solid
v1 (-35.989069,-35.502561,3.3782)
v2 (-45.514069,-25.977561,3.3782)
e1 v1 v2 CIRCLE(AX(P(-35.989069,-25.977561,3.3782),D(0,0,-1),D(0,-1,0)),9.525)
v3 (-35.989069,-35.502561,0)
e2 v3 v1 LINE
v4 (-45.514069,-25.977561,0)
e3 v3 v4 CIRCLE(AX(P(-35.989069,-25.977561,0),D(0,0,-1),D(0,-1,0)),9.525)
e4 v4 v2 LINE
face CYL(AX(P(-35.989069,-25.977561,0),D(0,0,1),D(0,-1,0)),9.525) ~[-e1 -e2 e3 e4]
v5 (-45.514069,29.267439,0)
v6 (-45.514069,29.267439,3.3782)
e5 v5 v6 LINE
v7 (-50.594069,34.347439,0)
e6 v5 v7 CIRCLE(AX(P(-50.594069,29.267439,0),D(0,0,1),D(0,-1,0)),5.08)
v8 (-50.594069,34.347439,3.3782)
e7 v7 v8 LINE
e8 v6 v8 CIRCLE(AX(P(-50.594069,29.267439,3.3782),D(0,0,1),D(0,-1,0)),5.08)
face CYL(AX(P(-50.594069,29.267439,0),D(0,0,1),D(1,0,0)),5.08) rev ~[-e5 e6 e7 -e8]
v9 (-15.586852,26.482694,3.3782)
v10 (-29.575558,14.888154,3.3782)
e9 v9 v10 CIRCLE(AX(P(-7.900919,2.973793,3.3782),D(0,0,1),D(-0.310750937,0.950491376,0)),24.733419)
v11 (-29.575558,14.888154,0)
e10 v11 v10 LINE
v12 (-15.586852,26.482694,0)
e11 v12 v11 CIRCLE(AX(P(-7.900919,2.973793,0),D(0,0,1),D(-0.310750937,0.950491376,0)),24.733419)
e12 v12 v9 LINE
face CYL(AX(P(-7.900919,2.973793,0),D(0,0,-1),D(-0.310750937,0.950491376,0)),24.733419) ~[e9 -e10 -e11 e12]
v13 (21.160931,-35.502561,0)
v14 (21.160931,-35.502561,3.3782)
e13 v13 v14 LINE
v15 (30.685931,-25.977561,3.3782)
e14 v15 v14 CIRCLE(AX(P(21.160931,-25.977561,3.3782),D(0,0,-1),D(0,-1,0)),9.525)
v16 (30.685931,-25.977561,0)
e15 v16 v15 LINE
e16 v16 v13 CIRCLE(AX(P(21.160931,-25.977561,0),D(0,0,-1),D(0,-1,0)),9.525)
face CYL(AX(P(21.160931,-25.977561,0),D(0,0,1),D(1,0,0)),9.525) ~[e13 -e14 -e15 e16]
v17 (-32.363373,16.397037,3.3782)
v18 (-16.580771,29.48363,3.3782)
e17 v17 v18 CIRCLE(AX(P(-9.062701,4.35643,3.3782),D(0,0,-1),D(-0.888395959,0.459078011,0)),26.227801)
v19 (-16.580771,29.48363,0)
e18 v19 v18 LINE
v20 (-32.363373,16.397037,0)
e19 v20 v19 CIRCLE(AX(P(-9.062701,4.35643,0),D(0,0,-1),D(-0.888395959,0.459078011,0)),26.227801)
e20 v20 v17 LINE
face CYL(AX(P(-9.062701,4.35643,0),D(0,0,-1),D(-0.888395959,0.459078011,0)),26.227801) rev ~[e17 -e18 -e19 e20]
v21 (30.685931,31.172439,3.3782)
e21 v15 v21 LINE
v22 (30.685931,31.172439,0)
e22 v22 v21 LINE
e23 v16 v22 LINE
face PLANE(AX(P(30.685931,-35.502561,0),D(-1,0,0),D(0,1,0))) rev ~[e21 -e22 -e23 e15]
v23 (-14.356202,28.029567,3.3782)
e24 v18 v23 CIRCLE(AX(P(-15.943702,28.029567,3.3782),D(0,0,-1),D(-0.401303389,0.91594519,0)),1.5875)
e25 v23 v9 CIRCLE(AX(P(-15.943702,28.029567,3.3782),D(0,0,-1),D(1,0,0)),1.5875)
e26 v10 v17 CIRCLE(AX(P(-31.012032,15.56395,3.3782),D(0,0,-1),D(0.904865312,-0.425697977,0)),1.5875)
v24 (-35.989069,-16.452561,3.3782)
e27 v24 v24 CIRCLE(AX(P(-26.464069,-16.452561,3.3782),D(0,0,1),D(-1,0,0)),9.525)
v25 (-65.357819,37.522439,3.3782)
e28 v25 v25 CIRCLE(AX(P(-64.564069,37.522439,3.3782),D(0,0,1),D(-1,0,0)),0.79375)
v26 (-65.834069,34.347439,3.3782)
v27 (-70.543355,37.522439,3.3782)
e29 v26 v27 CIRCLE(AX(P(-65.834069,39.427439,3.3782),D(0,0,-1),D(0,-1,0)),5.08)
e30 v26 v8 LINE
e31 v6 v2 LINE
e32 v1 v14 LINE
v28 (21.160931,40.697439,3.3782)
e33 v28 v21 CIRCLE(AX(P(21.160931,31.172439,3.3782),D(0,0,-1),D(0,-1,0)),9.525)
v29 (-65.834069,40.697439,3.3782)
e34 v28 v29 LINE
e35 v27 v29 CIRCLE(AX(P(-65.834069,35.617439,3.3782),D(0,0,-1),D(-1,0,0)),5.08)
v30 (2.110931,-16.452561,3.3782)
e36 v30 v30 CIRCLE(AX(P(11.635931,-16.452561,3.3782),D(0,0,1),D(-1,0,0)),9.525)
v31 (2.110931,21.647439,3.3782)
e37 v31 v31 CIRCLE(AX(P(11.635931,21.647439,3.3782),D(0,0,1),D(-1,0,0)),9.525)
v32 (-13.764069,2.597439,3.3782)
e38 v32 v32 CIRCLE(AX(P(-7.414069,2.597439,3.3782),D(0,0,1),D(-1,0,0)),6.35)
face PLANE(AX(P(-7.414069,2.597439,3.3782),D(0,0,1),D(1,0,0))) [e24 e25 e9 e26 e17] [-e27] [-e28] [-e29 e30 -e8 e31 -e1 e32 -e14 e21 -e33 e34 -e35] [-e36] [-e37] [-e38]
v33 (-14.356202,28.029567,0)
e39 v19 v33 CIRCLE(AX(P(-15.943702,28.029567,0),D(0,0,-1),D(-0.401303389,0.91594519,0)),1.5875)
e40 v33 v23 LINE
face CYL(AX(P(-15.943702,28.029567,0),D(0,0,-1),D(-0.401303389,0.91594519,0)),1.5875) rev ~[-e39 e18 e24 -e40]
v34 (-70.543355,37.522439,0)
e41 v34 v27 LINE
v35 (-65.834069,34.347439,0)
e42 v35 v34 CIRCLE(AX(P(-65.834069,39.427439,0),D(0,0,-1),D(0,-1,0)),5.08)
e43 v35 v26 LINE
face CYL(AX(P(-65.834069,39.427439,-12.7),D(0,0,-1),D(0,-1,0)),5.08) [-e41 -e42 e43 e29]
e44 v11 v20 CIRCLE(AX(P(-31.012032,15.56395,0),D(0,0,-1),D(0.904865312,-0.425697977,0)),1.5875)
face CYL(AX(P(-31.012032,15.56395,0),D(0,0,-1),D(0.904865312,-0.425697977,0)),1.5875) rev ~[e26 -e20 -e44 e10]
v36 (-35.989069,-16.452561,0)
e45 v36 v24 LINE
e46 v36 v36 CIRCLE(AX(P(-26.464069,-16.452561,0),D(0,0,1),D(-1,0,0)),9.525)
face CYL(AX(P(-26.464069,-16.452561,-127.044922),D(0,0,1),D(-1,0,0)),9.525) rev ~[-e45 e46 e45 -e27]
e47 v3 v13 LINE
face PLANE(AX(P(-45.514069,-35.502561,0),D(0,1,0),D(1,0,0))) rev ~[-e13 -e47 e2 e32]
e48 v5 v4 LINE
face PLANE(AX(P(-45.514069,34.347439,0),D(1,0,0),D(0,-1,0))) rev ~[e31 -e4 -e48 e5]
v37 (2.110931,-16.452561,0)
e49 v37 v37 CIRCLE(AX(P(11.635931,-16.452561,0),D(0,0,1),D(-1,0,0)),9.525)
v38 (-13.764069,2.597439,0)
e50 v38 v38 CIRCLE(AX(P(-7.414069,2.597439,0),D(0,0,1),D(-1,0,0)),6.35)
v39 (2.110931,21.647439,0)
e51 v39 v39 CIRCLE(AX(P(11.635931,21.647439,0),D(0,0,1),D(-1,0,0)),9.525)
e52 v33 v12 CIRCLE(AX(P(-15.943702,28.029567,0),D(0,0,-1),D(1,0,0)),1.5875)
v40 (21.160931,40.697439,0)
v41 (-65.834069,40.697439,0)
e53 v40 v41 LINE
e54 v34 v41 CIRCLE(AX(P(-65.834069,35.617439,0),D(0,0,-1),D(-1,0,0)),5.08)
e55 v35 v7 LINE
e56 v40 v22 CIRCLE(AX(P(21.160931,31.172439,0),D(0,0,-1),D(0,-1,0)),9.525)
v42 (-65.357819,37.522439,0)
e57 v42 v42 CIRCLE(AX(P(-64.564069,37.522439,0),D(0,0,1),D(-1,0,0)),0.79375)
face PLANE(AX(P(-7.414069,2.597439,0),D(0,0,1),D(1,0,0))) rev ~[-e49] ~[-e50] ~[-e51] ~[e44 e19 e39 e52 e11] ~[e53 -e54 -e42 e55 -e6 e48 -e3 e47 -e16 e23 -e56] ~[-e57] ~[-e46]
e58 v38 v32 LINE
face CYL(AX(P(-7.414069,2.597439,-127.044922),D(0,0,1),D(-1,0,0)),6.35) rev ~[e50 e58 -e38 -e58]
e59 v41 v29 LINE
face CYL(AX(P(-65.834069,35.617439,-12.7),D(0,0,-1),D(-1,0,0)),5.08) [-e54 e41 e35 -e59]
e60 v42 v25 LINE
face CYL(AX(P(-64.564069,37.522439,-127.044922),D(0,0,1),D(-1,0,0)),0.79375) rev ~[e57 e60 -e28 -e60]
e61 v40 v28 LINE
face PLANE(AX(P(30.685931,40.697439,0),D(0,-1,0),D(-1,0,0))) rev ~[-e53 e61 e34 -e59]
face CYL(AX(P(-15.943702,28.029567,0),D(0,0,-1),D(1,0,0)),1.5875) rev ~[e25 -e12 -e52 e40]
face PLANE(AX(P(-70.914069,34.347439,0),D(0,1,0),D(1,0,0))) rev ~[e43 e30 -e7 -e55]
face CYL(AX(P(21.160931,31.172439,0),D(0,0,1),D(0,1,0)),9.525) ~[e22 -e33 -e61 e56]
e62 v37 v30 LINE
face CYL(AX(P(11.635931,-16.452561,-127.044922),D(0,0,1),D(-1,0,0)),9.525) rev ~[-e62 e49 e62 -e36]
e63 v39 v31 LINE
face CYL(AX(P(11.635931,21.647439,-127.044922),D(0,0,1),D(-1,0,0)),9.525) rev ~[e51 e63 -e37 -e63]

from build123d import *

# Parameters (mm, degrees)
F0_W        = 25.4
F0_H        = 6.35
F1_DEPTH    = 3.3782
F2_D        = 12.7
F3_D        = 19.05
F4_D        = 1.5875
F5_R        = 9.525
F6_T1_DEPTH = 28.7782
F7_R        = 5.08


# Not quite as in the source:
# - a fillet or chamfer that OpenCascade refuses, or shapes differently, is made with other operations: its cross-section is extruded or revolved along the edge and cut away or added
# - a feature names something its author has since deleted; it is built from what else it names


with BuildPart() as f1:
    # F0 (on Top) → F1 (new body)
    with BuildSketch(Plane.XY):
        Polygon((30.6859308559, 40.6974393192), (-45.5140691441, 40.6974393192), (-45.5140691441, 34.3474393192), (-45.5140691441, -35.5025606808), (30.6859308559, -35.5025606808), align=None)
        with BuildLine():
            ThreePointArc((-16.5807714399, 29.4836296191), (-15.0751376879, 29.3583825497), (-14.3562023103, 28.0295666307))
            ThreePointArc((-14.3562023103, 28.0295666307), (-14.7013947794, 27.0412204117), (-15.5868520724, 26.4826942515))
            ThreePointArc((-15.5868520724, 26.4826942515), (-23.6844276087, 22.0164519839), (-29.5755584989, 14.8881544036))
            ThreePointArc((-29.5755584989, 14.8881544036), (-31.7676732764, 14.1678257415), (-32.3633731557, 16.397036865))
            ThreePointArc((-32.3633731557, 16.397036865), (-25.8037717935, 24.5463802201), (-16.5807714399, 29.4836296191))
        make_face(mode=Mode.SUBTRACT)
        with Locations((-58.2140691441, 37.5224393192)):
            Rectangle(F0_W, F0_H)
    extrude(amount=F1_DEPTH)

    # F2 (through all)
    with Locations(Plane(origin=(0, 0, 0), x_dir=(1, 0, 0), z_dir=(0, 0, -1))):
        with Locations((-7.4140691441, -2.5974393192)):
            Hole(F2_D / 2)

    # F3 (through all)
    with Locations(Plane(origin=(0, 0, 0), x_dir=(1, 0, 0), z_dir=(0, 0, -1))):
        with Locations((11.6359308559, -21.6474393192), (11.6359308559, 16.4525606808), (-26.4640691441, 16.4525606808)):
            Hole(F3_D / 2)

    # F4 (through all)
    with Locations(Plane(origin=(0, 0, 0), x_dir=(1, 0, 0), z_dir=(0, 0, -1))):
        with Locations((-64.5640691441, -37.5224393192)):
            Hole(F4_D / 2)

    # F5
    f5_edges = [f1.edges().sort_by_distance(p)[0] for p in [
        (30.685931, -35.502561, 1.6891),
        (-45.514069, -35.502561, 1.6891),
        (30.685931, 40.697439, 1.6891),
    ]]
    fillet(f5_edges, radius=F5_R)

    # F6: fillet of radius 5.08 on 2 edges, made by hand

    # F6_s2 → F6_t1 (cut)
    with BuildSketch(Plane.XY.offset(-12.7)):
        with BuildLine():
            ThreePointArc((-70.9140691441, 35.6174393192), (-69.4261715925, 39.2095417676), (-65.8340691441, 40.6974393192))
            Line((-65.8340691441, 40.6974393192), (-70.9140691441, 40.6974393192))
            Line((-70.9140691441, 40.6974393192), (-70.9140691441, 35.6174393192))
        make_face()
        with BuildLine():
            ThreePointArc((-65.8340691441, 34.3474393192), (-69.4261715925, 35.8353368707), (-70.9140691441, 39.4274393192))
            Line((-70.9140691441, 39.4274393192), (-70.9140691441, 34.3474393192))
            Line((-70.9140691441, 34.3474393192), (-65.8340691441, 34.3474393192))
        make_face()
    extrude(amount=F6_T1_DEPTH, mode=Mode.SUBTRACT)

    # F7
    f7_edges = [f1.edges().sort_by_distance(p)[0] for p in [
        (-45.514069, 34.347439, 1.6891),
    ]]
    fillet(f7_edges, radius=F7_R)


solid = f1.part
